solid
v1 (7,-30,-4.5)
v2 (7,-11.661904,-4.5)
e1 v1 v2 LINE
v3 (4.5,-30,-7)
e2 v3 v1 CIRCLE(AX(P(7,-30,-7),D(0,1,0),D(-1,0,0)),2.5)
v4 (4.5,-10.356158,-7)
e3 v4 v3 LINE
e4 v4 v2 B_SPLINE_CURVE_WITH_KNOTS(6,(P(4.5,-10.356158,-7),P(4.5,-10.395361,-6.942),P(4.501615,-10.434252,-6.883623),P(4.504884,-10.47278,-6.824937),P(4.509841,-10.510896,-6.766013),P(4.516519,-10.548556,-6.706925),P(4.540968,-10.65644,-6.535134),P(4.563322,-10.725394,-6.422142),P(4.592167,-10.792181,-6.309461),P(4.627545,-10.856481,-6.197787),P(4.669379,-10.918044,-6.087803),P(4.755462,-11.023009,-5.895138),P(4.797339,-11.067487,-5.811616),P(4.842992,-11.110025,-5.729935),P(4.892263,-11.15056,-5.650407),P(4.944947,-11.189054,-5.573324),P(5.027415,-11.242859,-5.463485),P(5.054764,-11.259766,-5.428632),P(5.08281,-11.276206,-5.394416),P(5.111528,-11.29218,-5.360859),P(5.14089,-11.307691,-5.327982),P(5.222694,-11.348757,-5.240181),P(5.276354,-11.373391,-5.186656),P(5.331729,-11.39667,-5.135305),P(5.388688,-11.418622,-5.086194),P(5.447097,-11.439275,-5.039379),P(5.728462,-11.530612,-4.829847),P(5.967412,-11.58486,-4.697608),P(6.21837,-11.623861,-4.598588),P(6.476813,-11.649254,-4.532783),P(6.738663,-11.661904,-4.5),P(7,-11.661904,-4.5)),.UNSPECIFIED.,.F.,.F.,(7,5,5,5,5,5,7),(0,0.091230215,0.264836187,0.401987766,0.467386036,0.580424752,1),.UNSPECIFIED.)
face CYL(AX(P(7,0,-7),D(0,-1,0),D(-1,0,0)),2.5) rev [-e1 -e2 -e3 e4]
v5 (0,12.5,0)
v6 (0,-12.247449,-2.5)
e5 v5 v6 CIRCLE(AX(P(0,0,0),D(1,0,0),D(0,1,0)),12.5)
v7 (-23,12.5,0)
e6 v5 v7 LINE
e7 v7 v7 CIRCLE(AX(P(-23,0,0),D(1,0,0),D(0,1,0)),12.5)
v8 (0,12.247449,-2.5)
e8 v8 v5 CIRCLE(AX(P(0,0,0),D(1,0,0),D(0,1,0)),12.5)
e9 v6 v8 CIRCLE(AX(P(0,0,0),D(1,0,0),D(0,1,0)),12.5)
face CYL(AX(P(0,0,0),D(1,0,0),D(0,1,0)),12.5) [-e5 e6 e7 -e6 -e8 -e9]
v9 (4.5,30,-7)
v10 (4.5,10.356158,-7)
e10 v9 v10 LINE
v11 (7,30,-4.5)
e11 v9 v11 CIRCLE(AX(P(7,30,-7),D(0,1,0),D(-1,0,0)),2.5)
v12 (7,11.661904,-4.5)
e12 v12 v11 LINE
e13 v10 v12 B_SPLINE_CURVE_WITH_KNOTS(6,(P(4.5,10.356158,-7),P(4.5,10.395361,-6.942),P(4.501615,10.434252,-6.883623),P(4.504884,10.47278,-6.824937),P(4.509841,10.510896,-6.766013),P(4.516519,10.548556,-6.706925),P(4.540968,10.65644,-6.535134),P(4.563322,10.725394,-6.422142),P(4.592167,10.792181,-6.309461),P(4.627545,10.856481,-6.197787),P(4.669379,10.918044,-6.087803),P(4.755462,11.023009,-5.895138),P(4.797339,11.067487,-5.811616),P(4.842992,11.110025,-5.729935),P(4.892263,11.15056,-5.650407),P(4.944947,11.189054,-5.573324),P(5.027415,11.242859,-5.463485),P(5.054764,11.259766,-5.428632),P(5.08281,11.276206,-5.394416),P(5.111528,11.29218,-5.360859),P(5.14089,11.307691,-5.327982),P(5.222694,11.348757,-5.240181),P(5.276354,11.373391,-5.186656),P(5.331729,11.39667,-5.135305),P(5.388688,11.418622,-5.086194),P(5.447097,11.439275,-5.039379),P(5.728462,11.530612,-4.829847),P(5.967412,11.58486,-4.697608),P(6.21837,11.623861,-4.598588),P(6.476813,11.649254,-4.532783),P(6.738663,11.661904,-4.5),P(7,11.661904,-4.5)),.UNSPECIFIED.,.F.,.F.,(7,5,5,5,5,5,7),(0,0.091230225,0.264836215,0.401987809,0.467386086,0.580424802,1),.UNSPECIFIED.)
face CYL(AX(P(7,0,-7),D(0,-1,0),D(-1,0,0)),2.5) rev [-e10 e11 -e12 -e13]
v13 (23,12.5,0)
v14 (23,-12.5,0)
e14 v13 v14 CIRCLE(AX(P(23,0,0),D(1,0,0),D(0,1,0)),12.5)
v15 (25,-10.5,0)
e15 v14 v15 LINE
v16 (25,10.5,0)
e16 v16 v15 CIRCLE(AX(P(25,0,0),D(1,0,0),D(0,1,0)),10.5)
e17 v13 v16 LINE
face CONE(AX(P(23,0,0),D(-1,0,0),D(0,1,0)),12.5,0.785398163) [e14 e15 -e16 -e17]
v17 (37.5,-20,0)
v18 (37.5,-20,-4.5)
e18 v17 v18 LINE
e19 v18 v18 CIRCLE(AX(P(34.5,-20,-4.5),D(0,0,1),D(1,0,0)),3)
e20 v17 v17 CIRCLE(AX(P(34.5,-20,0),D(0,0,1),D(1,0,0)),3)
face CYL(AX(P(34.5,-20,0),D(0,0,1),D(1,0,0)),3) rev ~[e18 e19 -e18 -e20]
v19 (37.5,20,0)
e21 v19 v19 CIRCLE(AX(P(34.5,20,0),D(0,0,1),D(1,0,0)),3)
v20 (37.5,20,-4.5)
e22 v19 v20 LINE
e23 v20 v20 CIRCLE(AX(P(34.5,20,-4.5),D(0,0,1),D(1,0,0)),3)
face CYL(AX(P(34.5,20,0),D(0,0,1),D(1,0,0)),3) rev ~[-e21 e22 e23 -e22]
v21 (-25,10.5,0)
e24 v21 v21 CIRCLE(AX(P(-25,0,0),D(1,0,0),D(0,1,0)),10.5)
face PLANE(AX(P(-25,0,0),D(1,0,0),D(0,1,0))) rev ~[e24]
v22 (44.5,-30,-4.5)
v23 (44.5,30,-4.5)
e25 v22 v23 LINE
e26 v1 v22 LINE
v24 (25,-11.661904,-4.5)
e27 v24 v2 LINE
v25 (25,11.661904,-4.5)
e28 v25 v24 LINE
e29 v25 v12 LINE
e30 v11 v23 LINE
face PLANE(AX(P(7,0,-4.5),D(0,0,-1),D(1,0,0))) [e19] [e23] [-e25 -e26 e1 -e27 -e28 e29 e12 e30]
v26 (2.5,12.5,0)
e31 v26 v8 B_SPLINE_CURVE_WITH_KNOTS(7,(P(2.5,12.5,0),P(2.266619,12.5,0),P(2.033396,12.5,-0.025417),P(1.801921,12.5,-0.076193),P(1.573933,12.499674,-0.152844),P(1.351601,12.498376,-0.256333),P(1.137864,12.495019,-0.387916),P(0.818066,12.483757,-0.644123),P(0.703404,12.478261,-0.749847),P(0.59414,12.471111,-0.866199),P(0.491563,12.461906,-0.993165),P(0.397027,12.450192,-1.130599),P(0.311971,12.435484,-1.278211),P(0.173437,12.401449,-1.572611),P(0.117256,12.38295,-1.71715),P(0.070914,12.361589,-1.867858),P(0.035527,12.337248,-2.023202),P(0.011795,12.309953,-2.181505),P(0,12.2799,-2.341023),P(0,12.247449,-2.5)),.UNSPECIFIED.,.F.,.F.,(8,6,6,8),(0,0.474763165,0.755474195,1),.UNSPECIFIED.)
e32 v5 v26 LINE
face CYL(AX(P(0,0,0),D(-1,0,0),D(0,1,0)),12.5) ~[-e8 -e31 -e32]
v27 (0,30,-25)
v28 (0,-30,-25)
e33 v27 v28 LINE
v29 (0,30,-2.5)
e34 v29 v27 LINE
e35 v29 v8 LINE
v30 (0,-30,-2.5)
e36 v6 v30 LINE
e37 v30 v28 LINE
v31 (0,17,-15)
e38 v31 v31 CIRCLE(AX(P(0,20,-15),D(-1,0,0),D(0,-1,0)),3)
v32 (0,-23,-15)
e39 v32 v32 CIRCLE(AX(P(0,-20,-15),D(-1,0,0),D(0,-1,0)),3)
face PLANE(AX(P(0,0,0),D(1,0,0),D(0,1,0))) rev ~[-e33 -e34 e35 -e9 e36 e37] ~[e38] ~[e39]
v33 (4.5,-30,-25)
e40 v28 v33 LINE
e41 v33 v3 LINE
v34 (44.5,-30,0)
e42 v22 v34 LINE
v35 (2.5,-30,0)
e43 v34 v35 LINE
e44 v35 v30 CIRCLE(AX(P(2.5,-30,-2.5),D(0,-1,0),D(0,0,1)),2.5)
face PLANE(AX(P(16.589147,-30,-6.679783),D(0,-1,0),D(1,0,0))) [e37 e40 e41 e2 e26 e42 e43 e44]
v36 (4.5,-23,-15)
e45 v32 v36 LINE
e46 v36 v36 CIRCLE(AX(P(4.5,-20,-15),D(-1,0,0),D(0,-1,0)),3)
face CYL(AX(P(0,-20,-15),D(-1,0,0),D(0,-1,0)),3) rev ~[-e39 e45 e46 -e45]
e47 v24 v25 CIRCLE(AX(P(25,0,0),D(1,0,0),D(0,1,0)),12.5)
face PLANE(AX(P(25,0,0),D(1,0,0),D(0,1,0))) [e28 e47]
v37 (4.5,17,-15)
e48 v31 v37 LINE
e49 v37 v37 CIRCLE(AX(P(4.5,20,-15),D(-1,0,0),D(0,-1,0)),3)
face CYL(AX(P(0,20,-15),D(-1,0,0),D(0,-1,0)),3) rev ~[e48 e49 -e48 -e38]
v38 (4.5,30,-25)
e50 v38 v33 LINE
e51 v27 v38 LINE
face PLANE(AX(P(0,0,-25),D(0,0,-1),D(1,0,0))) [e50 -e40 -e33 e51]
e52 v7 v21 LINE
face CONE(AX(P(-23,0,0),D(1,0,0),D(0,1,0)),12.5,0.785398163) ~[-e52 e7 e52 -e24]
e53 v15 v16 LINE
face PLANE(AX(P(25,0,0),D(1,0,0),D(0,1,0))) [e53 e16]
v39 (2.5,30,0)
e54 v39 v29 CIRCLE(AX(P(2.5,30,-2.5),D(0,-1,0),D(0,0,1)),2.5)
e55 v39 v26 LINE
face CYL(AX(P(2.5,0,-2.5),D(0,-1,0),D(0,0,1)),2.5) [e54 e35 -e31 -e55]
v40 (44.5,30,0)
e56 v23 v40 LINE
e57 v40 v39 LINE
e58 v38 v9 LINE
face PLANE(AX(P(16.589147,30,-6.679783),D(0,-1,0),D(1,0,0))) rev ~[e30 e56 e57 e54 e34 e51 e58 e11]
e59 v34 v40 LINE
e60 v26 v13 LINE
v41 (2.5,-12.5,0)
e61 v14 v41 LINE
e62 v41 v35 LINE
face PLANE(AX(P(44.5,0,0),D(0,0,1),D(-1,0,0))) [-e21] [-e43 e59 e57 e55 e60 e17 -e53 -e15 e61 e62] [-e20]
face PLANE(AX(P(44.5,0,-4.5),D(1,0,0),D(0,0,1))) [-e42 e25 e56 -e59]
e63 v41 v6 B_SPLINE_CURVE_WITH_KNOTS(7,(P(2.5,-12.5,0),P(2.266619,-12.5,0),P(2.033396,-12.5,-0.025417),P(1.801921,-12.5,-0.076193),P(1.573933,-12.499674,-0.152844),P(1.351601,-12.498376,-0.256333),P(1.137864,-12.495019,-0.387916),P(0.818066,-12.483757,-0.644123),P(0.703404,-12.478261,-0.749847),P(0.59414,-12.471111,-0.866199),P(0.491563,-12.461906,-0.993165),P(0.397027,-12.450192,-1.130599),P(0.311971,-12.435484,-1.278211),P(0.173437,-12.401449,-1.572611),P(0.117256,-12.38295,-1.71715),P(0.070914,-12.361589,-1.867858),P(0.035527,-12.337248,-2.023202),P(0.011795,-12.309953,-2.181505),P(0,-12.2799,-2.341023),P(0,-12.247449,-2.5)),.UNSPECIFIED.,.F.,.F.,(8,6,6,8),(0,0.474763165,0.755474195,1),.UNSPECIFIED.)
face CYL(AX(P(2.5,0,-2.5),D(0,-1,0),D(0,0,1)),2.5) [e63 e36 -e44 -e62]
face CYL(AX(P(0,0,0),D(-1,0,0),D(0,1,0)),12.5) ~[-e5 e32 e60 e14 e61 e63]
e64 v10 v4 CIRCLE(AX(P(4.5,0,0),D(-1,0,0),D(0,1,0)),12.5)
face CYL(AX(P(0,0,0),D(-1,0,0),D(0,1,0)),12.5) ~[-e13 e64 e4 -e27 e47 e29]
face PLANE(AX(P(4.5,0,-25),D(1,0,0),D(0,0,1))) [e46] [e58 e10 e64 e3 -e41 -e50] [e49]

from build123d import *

# Parameters (mm, degrees)
F1_DEPTH      = 30
F2_R          = 12.5
F3_DEPTH      = 25
F3_DEPTH_BACK = 25
F4_SIZE       = 2
F5_R          = 3
F6_DEPTH      = 44.501
F7_R          = 3
F8_DEPTH      = 25.001


with BuildPart() as f1:
    # F0 (on Front) → F1 (new body, symmetric)
    with BuildSketch(Plane.XZ):
        with BuildLine():
            Line((44.5, 0), (2.5, 0))
            ThreePointArc((2.5, 0), (0.732233047, -0.732233047), (0, -2.5))
            Line((0, -2.5), (0, -25))
            Line((0, -25), (4.5, -25))
            Line((4.5, -25), (4.5, -7))
            ThreePointArc((4.5, -7), (5.232233047, -5.232233047), (7, -4.5))
            Line((7, -4.5), (44.5, -4.5))
            Line((44.5, -4.5), (44.5, 0))
        make_face()
    extrude(amount=F1_DEPTH, both=True)

    # F2 (on Right) → F3 (join, two sides)
    with BuildSketch(Plane.YZ) as f3_sk:
        Circle(F2_R)
    extrude(amount=F3_DEPTH)
    extrude(f3_sk.sketch, amount=-F3_DEPTH_BACK)

    # F4
    f4_edges = [f1.edges().sort_by_distance(p)[0] for p in [
        (-25, -12.5, 0),
        (25, 0, 12.5),
    ]]
    chamfer(f4_edges, length=F4_SIZE)

    # F5 (on face) → F6 (cut, through all)
    with BuildSketch(Plane(origin=(0, 0, 0), x_dir=(0, -1, 0), z_dir=(-1, 0, 0))):
        with Locations((-20, -15)):
            Circle(F5_R)
        with Locations((20, -15)):
            Circle(F5_R)
    extrude(amount=-F6_DEPTH, mode=Mode.SUBTRACT)

    # F7 (on face) → F8 (cut, through all)
    with BuildSketch(Plane.XY):
        with Locations((34.5, 20)):
            Circle(F7_R)
        with Locations((34.5, -20)):
            Circle(F7_R)
    extrude(amount=-F8_DEPTH, mode=Mode.SUBTRACT)


solid = f1.part
